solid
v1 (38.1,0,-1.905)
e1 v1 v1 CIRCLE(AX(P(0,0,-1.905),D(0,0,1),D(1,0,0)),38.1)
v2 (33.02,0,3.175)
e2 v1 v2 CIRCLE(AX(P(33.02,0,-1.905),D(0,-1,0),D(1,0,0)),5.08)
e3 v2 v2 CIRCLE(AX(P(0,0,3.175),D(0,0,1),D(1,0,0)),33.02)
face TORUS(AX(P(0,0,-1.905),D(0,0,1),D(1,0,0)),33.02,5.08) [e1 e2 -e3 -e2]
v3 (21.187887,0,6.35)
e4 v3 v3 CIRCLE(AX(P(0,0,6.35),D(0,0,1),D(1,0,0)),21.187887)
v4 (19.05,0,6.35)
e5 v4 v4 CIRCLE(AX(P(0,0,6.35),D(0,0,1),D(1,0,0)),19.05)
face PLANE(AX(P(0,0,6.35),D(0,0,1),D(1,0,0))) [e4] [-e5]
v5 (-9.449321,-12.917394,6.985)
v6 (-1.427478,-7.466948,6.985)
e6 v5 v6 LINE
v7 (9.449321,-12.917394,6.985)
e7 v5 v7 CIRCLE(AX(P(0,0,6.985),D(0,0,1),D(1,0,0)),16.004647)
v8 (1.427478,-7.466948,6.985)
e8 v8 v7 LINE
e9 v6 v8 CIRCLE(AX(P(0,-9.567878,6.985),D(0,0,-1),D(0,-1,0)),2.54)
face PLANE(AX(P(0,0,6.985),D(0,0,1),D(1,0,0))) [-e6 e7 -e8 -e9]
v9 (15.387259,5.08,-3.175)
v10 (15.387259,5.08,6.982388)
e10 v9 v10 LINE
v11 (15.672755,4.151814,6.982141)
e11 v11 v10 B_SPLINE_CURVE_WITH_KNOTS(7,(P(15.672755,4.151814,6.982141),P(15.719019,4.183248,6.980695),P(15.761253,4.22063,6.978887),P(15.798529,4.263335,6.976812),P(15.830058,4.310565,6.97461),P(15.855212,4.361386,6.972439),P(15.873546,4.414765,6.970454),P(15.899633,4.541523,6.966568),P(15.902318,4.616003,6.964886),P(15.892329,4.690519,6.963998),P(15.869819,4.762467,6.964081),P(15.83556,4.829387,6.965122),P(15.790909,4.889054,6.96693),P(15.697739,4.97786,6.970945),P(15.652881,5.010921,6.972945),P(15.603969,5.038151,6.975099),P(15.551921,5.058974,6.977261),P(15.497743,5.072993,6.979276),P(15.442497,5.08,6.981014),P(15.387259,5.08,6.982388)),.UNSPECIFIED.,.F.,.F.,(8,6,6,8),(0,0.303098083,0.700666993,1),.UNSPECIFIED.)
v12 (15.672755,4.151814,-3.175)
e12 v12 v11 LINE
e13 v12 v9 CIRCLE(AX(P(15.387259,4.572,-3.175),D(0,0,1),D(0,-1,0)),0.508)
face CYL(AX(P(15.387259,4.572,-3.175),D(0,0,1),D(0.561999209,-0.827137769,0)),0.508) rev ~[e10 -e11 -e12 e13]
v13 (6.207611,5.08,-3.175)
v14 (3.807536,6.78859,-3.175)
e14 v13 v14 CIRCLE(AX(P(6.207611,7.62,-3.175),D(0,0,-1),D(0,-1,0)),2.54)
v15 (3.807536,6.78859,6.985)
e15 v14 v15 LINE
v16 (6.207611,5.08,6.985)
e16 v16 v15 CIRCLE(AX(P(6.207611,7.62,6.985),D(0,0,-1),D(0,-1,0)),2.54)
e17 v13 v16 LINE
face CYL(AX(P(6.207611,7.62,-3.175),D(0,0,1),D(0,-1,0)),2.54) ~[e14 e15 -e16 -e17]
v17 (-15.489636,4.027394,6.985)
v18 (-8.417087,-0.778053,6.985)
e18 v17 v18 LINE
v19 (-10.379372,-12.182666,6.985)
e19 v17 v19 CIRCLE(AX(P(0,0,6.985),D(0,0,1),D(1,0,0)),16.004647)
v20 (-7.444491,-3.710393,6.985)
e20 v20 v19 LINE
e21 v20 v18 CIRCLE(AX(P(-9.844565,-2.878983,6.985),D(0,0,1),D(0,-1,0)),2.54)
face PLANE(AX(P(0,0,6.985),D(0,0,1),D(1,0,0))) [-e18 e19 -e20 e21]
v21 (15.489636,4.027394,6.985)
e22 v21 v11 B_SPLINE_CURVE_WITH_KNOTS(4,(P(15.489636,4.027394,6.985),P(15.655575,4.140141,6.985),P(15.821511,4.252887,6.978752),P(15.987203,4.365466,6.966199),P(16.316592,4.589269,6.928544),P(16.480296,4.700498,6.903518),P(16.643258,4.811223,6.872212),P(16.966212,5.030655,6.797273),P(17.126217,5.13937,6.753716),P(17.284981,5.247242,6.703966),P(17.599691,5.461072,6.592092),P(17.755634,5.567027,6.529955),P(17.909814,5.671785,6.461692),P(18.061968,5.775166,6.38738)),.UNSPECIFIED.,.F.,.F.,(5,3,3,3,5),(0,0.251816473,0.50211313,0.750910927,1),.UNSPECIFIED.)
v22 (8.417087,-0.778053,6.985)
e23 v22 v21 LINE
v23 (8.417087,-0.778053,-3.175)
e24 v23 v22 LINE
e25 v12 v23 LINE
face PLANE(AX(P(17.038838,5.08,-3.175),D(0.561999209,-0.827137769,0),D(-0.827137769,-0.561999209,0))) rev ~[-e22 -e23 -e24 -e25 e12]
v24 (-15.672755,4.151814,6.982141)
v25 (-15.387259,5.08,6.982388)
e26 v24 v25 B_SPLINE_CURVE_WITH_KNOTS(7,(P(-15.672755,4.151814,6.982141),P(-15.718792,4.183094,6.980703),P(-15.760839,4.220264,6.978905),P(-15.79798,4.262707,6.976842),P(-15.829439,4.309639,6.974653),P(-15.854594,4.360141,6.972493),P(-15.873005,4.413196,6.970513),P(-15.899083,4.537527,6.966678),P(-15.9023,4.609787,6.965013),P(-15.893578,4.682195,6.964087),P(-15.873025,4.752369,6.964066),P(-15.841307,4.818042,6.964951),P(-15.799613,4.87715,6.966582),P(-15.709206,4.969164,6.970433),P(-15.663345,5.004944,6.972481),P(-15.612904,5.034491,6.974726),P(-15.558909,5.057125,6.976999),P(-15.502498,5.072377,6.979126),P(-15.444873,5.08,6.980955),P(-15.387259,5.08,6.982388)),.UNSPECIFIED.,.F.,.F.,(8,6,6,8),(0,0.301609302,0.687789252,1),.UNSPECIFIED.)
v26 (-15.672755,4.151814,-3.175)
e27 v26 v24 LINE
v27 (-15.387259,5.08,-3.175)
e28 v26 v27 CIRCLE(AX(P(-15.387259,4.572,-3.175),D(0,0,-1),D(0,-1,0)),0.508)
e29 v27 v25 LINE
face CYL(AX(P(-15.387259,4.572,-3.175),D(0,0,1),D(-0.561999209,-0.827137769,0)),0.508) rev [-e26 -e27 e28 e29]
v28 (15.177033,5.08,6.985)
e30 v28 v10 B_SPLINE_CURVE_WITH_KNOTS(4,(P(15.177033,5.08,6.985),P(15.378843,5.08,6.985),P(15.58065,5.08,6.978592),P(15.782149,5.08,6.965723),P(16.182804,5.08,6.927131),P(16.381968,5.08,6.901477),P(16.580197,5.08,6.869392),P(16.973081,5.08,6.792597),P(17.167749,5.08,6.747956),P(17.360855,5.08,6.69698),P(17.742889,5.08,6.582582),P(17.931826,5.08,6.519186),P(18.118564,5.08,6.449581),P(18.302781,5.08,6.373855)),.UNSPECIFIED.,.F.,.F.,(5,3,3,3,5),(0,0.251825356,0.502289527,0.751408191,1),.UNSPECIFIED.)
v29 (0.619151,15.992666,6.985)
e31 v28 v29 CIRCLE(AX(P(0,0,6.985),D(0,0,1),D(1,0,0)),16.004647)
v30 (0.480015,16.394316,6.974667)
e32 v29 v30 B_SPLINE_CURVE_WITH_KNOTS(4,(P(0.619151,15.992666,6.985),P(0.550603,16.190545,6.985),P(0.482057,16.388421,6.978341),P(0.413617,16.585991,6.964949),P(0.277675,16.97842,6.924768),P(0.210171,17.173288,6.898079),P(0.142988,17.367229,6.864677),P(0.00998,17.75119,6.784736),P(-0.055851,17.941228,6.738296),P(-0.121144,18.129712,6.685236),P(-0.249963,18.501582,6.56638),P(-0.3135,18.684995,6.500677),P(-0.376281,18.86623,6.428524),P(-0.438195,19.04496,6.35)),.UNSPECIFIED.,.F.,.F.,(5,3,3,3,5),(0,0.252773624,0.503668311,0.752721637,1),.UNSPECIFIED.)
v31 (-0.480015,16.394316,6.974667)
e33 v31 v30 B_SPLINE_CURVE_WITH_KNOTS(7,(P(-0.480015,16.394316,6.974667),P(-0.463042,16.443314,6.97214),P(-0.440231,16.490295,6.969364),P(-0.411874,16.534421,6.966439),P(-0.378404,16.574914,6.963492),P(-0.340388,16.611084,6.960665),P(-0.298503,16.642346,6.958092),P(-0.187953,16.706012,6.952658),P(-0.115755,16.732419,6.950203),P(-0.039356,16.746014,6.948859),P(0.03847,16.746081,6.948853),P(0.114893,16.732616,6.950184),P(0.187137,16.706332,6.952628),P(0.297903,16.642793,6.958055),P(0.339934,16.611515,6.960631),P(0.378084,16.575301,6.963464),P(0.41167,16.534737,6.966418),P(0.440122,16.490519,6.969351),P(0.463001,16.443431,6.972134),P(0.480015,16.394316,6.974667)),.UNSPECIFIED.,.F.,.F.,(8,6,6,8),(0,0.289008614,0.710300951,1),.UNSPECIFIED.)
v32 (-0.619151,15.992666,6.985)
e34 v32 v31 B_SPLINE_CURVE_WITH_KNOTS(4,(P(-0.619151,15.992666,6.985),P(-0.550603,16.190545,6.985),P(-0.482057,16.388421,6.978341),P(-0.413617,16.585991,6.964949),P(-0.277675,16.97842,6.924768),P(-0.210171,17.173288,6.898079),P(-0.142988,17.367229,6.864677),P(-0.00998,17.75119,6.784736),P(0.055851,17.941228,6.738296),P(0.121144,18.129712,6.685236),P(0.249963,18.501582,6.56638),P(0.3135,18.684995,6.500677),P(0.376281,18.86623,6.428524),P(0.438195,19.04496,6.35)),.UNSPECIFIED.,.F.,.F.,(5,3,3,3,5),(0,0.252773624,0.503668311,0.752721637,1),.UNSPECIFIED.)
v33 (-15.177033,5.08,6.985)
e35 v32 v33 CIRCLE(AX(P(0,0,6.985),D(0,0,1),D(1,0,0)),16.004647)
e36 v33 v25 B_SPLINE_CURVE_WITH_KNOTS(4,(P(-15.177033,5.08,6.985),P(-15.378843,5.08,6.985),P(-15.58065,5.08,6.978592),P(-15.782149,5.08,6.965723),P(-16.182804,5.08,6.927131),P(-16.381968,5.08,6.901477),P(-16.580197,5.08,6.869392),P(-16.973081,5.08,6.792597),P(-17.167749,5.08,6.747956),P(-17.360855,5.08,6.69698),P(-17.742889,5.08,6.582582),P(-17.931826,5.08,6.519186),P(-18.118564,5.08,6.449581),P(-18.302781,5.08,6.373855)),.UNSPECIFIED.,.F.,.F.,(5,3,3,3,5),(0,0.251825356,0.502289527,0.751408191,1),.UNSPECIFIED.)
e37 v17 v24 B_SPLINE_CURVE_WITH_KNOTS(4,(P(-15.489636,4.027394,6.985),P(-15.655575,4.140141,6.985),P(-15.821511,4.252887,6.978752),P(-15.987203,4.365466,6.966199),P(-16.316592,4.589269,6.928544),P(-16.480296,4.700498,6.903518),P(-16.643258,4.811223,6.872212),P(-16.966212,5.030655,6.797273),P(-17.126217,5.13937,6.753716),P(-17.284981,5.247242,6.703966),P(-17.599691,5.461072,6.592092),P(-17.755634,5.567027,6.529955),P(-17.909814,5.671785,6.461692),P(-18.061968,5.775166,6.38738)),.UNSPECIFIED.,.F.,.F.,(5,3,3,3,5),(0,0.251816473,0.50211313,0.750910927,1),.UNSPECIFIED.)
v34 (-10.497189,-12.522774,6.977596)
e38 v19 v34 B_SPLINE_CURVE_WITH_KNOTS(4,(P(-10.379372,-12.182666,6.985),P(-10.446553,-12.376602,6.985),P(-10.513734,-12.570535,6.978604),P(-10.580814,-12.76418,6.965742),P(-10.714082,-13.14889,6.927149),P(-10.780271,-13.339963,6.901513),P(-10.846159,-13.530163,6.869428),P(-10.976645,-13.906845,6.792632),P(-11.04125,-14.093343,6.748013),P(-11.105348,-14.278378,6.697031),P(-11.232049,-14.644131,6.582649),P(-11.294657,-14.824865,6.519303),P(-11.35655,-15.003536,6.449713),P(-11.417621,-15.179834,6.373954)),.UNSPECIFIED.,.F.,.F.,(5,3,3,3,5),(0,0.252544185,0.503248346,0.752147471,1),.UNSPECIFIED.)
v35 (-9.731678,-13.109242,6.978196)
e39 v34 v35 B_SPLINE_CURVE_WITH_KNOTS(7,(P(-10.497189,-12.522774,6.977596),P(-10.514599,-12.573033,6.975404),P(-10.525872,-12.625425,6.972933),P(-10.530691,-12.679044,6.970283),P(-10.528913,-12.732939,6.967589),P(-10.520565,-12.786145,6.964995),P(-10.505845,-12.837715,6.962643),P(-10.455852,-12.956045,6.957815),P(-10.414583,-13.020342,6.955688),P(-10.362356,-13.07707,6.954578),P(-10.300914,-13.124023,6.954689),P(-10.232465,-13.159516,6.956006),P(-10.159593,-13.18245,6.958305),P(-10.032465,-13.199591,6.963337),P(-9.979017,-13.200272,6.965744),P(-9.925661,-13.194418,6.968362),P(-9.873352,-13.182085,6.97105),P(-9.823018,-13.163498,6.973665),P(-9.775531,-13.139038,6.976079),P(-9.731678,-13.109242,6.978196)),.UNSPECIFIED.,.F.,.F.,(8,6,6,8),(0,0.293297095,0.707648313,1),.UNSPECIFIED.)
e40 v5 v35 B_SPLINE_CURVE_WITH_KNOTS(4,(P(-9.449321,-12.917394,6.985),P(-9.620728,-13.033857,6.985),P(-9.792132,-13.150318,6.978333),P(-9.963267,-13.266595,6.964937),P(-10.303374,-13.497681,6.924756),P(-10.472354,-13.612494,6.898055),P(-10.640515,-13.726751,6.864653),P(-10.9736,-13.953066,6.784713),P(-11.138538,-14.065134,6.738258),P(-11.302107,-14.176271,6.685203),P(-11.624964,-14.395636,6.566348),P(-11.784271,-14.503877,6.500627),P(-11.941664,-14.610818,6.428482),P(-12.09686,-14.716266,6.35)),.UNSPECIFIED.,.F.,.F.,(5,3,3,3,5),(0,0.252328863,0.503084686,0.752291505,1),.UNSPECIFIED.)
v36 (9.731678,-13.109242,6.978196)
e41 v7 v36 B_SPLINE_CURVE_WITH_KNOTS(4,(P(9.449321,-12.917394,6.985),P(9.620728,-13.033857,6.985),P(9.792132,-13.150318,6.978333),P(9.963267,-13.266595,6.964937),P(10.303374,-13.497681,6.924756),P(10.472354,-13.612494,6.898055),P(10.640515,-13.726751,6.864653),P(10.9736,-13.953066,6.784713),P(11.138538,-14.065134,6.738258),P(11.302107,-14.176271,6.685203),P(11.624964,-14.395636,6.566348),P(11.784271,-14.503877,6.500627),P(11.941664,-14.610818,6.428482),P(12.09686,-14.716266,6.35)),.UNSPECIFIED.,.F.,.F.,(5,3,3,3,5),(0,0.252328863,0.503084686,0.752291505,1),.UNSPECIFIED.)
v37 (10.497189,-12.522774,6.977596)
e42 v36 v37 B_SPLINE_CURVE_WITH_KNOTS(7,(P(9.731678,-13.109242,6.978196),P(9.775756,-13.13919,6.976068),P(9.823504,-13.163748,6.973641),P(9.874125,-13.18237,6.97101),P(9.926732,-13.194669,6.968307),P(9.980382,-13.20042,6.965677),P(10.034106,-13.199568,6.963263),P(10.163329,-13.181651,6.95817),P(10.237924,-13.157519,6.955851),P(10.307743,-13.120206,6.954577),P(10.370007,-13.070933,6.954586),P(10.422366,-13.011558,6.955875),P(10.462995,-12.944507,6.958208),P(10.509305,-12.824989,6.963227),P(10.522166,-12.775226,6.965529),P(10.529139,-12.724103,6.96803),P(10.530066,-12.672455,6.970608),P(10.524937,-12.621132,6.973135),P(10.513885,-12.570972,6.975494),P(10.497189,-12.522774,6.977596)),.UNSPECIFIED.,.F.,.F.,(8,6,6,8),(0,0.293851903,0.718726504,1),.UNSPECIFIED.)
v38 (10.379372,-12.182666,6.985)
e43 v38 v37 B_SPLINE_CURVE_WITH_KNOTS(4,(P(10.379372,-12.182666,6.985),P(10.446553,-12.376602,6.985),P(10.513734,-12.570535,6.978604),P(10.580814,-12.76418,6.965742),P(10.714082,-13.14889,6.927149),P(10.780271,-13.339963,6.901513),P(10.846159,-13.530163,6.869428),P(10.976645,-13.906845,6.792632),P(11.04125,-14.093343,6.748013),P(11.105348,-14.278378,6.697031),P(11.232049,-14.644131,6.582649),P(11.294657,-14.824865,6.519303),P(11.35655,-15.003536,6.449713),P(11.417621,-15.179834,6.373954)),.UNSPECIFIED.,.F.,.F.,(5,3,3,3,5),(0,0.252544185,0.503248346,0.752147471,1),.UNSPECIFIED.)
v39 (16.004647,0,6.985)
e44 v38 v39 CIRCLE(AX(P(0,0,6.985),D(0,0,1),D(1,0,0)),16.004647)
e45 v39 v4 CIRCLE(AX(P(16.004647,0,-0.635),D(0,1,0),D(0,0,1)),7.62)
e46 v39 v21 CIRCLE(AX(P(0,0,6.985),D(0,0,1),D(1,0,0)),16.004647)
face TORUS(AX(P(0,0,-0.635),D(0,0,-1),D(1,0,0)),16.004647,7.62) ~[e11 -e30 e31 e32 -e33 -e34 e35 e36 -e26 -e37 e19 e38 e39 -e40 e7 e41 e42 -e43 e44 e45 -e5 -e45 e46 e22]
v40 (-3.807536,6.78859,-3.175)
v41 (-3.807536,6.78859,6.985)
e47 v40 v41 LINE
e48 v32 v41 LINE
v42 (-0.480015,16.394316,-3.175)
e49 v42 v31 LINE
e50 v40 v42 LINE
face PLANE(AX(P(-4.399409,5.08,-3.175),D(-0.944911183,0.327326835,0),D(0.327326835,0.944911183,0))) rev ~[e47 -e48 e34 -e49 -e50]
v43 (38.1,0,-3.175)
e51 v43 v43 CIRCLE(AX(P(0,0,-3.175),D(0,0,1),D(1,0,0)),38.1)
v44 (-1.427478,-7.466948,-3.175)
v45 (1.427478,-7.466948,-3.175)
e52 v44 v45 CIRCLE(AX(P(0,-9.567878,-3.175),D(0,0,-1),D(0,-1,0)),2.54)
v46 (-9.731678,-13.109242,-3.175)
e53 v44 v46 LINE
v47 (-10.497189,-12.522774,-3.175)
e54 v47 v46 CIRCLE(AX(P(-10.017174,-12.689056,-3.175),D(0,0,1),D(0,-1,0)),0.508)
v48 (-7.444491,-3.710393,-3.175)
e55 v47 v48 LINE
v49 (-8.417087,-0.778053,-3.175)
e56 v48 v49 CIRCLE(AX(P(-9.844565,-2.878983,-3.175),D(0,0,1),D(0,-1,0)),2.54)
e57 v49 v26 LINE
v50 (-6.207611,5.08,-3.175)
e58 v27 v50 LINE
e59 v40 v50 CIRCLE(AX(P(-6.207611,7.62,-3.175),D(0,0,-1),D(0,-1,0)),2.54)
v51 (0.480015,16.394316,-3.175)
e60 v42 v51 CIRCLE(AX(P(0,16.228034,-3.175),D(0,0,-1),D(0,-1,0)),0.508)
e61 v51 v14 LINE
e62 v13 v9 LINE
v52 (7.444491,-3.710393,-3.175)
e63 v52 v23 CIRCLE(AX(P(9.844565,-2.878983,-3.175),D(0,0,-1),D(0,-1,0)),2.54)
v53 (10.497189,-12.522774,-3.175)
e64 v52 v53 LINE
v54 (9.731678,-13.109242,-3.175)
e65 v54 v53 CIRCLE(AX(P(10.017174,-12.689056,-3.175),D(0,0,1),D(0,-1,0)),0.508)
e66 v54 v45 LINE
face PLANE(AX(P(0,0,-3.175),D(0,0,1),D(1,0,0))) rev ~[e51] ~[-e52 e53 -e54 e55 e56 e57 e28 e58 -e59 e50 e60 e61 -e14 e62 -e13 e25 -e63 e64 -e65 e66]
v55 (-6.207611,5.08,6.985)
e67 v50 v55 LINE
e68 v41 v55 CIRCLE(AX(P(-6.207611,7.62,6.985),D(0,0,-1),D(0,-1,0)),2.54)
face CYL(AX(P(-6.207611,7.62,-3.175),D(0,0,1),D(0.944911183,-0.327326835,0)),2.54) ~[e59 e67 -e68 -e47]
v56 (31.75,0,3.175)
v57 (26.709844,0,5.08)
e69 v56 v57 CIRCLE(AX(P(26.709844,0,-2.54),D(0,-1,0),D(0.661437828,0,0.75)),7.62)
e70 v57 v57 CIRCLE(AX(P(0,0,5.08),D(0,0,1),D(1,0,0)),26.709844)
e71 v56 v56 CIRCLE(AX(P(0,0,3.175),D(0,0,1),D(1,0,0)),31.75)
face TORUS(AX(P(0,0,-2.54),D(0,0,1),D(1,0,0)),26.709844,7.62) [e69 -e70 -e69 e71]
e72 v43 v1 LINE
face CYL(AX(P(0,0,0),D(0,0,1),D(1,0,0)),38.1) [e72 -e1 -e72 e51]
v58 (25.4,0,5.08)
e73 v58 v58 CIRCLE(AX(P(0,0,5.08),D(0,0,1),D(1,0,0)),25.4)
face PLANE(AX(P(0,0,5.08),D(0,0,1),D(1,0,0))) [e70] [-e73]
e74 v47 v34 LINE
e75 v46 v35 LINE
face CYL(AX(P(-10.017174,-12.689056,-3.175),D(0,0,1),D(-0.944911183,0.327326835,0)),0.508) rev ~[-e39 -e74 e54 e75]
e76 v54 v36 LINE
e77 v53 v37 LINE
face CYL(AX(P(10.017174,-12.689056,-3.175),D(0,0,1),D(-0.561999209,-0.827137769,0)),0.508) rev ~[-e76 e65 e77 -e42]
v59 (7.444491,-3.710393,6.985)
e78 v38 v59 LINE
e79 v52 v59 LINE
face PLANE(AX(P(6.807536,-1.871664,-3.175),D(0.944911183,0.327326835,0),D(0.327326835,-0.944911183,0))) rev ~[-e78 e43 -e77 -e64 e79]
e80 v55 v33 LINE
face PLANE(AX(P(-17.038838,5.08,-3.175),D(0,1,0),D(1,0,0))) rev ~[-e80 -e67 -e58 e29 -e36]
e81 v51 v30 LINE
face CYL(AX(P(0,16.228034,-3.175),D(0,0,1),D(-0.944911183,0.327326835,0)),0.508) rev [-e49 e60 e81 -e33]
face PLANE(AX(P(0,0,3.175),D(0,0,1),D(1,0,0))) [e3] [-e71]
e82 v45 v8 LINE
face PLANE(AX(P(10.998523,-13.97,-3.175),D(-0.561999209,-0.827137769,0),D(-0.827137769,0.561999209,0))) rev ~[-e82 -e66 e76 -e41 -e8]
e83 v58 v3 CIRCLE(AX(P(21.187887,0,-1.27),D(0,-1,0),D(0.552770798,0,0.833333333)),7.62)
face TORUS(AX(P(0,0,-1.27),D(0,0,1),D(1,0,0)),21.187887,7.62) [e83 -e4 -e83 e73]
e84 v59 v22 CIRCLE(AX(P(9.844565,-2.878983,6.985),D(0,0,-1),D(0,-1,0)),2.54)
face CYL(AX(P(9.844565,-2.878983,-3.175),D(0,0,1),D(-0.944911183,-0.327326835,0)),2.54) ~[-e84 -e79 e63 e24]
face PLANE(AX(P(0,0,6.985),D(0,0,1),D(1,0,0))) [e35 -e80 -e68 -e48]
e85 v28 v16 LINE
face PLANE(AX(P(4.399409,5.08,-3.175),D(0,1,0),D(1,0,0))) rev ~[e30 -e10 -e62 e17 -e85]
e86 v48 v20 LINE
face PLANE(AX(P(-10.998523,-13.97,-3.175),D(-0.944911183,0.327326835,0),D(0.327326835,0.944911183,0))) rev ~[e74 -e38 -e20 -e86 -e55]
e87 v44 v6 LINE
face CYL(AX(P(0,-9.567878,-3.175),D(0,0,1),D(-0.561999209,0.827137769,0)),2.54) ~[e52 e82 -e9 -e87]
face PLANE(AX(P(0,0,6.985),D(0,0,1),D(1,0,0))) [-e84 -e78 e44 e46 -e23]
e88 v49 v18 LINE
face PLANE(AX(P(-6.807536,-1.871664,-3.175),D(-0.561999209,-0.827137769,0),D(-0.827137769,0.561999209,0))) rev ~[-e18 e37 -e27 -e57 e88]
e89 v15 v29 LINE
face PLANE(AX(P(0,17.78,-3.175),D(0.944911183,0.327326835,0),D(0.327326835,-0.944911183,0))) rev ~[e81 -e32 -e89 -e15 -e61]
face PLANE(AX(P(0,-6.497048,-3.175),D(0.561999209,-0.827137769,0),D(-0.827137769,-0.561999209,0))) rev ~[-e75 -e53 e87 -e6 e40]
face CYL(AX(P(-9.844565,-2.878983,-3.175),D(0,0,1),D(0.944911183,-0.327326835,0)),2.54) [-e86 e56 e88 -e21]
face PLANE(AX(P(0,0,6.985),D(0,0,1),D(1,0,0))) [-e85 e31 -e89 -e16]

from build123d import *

# Parameters (mm, degrees)
F0_R      = 38.1
F1_DEPTH  = 3.175
F3_R      = 31.75
F4_DEPTH  = 1.905
F5_R      = 25.4
F6_DEPTH  = 1.27
F7_R      = 19.05
F8_DEPTH  = 0.635
F10_DEPTH = 10.161
F11_R     = 5.08
F15_R     = 2.54
F16_R     = 0.508


# Not quite as in the source:
# - a fillet or chamfer that OpenCascade refuses, or shapes differently, is made with other operations: its cross-section is extruded or revolved along the edge and cut away or added


with BuildPart() as f1:
    # F0 (on Top) → F1 (new body, symmetric)
    with BuildSketch(Plane.XY):
        Circle(F0_R)
    extrude(amount=F1_DEPTH, both=True)

    # F3 (on face) → F4 (join)
    with BuildSketch(Plane.XY.offset(3.175)):
        Circle(F3_R)
    extrude(amount=F4_DEPTH)

    # F5 (on face) → F6 (join)
    with BuildSketch(Plane.XY.offset(5.08)):
        Circle(F5_R)
    extrude(amount=F6_DEPTH)

    # F7 (on face) → F8 (join)
    with BuildSketch(Plane.XY.offset(6.35)):
        Circle(F7_R)
    extrude(amount=F8_DEPTH)

    # F9 (on face) → F10 (cut, through all)
    with BuildSketch(Plane(origin=(0, 0, -3.175), x_dir=(1, 0, 0), z_dir=(0, 0, -1))):
        Polygon((-6.8075360054, 1.8716637263), (-17.0388379885, -5.08), (-4.3994090512, -5.08), (0, -17.78), (4.3994090512, -5.08), (17.0388379885, -5.08), (6.8075360054, 1.8716637263), (10.9985226281, 13.97), (0, 6.4970477871), (-10.9985226281, 13.97), align=None)
    extrude(amount=-F10_DEPTH, mode=Mode.SUBTRACT)

    # F11
    f11_edges = [f1.edges().sort_by_distance(p)[0] for p in [
        (-38.1, 0, 3.175),
    ]]
    fillet(f11_edges, radius=F11_R)

    # F12: fillet of radius 7.62 on 1 edges, made by hand

    # F12_s1 → F12_t2 (revolve, cut)
    with BuildSketch(Plane.XZ):
        with BuildLine():
            ThreePointArc((31.75, 3.175), (29.4039205887, 4.5878573218), (26.7098437524, 5.08))
            Line((26.7098437524, 5.08), (31.75, 5.08))
            Line((31.75, 5.08), (31.75, 3.175))
        make_face()
    revolve(axis=Axis((0, 0, 5.08), (0, 0, 1)), mode=Mode.SUBTRACT)

    # F13: fillet of radius 7.62 on 1 edges, made by hand

    # F13_s1 → F13_t2 (revolve, cut)
    with BuildSketch(Plane.XZ):
        with BuildLine():
            ThreePointArc((25.4, 5.08), (23.3875910419, 6.0255945611), (21.1878865162, 6.35))
            Line((21.1878865162, 6.35), (25.4, 6.35))
            Line((25.4, 6.35), (25.4, 5.08))
        make_face()
    revolve(axis=Axis((0, 0, 6.35), (0, 0, 1)), mode=Mode.SUBTRACT)

    # F14: fillet of radius 7.62 on 1 edges, made by hand

    # F14_s1 → F14_t2 (revolve, cut)
    with BuildSketch(Plane.XZ):
        with BuildLine():
            ThreePointArc((16.0046469827, 6.985), (17.5600729694, 6.824560979), (19.05, 6.35))
            Line((19.05, 6.35), (19.05, 6.985))
            Line((19.05, 6.985), (16.0046469827, 6.985))
        make_face()
    revolve(axis=Axis((0, 0, 6.985), (0, 0, 1)), mode=Mode.SUBTRACT)

    # F15
    f15_edges = [f1.edges().sort_by_distance(p)[0] for p in [
        (4.399409, 5.08, 1.905),
        (-4.399409, 5.08, 1.905),
        (-6.807536, -1.871664, 1.905),
        (0, -6.497048, 1.905),
        (6.807536, -1.871664, 1.905),
    ]]
    fillet(f15_edges, radius=F15_R)

    # F16
    f16_edges = [f1.edges().sort_by_distance(p)[0] for p in [
        (-10.998523, -13.97, 1.800149),
        (-17.038838, 5.08, 1.800149),
        (0, 17.78, 1.800149),
        (17.038838, 5.08, 1.800149),
        (10.998523, -13.97, 1.800149),
    ]]
    fillet(f16_edges, radius=F16_R)


solid = f1.part
